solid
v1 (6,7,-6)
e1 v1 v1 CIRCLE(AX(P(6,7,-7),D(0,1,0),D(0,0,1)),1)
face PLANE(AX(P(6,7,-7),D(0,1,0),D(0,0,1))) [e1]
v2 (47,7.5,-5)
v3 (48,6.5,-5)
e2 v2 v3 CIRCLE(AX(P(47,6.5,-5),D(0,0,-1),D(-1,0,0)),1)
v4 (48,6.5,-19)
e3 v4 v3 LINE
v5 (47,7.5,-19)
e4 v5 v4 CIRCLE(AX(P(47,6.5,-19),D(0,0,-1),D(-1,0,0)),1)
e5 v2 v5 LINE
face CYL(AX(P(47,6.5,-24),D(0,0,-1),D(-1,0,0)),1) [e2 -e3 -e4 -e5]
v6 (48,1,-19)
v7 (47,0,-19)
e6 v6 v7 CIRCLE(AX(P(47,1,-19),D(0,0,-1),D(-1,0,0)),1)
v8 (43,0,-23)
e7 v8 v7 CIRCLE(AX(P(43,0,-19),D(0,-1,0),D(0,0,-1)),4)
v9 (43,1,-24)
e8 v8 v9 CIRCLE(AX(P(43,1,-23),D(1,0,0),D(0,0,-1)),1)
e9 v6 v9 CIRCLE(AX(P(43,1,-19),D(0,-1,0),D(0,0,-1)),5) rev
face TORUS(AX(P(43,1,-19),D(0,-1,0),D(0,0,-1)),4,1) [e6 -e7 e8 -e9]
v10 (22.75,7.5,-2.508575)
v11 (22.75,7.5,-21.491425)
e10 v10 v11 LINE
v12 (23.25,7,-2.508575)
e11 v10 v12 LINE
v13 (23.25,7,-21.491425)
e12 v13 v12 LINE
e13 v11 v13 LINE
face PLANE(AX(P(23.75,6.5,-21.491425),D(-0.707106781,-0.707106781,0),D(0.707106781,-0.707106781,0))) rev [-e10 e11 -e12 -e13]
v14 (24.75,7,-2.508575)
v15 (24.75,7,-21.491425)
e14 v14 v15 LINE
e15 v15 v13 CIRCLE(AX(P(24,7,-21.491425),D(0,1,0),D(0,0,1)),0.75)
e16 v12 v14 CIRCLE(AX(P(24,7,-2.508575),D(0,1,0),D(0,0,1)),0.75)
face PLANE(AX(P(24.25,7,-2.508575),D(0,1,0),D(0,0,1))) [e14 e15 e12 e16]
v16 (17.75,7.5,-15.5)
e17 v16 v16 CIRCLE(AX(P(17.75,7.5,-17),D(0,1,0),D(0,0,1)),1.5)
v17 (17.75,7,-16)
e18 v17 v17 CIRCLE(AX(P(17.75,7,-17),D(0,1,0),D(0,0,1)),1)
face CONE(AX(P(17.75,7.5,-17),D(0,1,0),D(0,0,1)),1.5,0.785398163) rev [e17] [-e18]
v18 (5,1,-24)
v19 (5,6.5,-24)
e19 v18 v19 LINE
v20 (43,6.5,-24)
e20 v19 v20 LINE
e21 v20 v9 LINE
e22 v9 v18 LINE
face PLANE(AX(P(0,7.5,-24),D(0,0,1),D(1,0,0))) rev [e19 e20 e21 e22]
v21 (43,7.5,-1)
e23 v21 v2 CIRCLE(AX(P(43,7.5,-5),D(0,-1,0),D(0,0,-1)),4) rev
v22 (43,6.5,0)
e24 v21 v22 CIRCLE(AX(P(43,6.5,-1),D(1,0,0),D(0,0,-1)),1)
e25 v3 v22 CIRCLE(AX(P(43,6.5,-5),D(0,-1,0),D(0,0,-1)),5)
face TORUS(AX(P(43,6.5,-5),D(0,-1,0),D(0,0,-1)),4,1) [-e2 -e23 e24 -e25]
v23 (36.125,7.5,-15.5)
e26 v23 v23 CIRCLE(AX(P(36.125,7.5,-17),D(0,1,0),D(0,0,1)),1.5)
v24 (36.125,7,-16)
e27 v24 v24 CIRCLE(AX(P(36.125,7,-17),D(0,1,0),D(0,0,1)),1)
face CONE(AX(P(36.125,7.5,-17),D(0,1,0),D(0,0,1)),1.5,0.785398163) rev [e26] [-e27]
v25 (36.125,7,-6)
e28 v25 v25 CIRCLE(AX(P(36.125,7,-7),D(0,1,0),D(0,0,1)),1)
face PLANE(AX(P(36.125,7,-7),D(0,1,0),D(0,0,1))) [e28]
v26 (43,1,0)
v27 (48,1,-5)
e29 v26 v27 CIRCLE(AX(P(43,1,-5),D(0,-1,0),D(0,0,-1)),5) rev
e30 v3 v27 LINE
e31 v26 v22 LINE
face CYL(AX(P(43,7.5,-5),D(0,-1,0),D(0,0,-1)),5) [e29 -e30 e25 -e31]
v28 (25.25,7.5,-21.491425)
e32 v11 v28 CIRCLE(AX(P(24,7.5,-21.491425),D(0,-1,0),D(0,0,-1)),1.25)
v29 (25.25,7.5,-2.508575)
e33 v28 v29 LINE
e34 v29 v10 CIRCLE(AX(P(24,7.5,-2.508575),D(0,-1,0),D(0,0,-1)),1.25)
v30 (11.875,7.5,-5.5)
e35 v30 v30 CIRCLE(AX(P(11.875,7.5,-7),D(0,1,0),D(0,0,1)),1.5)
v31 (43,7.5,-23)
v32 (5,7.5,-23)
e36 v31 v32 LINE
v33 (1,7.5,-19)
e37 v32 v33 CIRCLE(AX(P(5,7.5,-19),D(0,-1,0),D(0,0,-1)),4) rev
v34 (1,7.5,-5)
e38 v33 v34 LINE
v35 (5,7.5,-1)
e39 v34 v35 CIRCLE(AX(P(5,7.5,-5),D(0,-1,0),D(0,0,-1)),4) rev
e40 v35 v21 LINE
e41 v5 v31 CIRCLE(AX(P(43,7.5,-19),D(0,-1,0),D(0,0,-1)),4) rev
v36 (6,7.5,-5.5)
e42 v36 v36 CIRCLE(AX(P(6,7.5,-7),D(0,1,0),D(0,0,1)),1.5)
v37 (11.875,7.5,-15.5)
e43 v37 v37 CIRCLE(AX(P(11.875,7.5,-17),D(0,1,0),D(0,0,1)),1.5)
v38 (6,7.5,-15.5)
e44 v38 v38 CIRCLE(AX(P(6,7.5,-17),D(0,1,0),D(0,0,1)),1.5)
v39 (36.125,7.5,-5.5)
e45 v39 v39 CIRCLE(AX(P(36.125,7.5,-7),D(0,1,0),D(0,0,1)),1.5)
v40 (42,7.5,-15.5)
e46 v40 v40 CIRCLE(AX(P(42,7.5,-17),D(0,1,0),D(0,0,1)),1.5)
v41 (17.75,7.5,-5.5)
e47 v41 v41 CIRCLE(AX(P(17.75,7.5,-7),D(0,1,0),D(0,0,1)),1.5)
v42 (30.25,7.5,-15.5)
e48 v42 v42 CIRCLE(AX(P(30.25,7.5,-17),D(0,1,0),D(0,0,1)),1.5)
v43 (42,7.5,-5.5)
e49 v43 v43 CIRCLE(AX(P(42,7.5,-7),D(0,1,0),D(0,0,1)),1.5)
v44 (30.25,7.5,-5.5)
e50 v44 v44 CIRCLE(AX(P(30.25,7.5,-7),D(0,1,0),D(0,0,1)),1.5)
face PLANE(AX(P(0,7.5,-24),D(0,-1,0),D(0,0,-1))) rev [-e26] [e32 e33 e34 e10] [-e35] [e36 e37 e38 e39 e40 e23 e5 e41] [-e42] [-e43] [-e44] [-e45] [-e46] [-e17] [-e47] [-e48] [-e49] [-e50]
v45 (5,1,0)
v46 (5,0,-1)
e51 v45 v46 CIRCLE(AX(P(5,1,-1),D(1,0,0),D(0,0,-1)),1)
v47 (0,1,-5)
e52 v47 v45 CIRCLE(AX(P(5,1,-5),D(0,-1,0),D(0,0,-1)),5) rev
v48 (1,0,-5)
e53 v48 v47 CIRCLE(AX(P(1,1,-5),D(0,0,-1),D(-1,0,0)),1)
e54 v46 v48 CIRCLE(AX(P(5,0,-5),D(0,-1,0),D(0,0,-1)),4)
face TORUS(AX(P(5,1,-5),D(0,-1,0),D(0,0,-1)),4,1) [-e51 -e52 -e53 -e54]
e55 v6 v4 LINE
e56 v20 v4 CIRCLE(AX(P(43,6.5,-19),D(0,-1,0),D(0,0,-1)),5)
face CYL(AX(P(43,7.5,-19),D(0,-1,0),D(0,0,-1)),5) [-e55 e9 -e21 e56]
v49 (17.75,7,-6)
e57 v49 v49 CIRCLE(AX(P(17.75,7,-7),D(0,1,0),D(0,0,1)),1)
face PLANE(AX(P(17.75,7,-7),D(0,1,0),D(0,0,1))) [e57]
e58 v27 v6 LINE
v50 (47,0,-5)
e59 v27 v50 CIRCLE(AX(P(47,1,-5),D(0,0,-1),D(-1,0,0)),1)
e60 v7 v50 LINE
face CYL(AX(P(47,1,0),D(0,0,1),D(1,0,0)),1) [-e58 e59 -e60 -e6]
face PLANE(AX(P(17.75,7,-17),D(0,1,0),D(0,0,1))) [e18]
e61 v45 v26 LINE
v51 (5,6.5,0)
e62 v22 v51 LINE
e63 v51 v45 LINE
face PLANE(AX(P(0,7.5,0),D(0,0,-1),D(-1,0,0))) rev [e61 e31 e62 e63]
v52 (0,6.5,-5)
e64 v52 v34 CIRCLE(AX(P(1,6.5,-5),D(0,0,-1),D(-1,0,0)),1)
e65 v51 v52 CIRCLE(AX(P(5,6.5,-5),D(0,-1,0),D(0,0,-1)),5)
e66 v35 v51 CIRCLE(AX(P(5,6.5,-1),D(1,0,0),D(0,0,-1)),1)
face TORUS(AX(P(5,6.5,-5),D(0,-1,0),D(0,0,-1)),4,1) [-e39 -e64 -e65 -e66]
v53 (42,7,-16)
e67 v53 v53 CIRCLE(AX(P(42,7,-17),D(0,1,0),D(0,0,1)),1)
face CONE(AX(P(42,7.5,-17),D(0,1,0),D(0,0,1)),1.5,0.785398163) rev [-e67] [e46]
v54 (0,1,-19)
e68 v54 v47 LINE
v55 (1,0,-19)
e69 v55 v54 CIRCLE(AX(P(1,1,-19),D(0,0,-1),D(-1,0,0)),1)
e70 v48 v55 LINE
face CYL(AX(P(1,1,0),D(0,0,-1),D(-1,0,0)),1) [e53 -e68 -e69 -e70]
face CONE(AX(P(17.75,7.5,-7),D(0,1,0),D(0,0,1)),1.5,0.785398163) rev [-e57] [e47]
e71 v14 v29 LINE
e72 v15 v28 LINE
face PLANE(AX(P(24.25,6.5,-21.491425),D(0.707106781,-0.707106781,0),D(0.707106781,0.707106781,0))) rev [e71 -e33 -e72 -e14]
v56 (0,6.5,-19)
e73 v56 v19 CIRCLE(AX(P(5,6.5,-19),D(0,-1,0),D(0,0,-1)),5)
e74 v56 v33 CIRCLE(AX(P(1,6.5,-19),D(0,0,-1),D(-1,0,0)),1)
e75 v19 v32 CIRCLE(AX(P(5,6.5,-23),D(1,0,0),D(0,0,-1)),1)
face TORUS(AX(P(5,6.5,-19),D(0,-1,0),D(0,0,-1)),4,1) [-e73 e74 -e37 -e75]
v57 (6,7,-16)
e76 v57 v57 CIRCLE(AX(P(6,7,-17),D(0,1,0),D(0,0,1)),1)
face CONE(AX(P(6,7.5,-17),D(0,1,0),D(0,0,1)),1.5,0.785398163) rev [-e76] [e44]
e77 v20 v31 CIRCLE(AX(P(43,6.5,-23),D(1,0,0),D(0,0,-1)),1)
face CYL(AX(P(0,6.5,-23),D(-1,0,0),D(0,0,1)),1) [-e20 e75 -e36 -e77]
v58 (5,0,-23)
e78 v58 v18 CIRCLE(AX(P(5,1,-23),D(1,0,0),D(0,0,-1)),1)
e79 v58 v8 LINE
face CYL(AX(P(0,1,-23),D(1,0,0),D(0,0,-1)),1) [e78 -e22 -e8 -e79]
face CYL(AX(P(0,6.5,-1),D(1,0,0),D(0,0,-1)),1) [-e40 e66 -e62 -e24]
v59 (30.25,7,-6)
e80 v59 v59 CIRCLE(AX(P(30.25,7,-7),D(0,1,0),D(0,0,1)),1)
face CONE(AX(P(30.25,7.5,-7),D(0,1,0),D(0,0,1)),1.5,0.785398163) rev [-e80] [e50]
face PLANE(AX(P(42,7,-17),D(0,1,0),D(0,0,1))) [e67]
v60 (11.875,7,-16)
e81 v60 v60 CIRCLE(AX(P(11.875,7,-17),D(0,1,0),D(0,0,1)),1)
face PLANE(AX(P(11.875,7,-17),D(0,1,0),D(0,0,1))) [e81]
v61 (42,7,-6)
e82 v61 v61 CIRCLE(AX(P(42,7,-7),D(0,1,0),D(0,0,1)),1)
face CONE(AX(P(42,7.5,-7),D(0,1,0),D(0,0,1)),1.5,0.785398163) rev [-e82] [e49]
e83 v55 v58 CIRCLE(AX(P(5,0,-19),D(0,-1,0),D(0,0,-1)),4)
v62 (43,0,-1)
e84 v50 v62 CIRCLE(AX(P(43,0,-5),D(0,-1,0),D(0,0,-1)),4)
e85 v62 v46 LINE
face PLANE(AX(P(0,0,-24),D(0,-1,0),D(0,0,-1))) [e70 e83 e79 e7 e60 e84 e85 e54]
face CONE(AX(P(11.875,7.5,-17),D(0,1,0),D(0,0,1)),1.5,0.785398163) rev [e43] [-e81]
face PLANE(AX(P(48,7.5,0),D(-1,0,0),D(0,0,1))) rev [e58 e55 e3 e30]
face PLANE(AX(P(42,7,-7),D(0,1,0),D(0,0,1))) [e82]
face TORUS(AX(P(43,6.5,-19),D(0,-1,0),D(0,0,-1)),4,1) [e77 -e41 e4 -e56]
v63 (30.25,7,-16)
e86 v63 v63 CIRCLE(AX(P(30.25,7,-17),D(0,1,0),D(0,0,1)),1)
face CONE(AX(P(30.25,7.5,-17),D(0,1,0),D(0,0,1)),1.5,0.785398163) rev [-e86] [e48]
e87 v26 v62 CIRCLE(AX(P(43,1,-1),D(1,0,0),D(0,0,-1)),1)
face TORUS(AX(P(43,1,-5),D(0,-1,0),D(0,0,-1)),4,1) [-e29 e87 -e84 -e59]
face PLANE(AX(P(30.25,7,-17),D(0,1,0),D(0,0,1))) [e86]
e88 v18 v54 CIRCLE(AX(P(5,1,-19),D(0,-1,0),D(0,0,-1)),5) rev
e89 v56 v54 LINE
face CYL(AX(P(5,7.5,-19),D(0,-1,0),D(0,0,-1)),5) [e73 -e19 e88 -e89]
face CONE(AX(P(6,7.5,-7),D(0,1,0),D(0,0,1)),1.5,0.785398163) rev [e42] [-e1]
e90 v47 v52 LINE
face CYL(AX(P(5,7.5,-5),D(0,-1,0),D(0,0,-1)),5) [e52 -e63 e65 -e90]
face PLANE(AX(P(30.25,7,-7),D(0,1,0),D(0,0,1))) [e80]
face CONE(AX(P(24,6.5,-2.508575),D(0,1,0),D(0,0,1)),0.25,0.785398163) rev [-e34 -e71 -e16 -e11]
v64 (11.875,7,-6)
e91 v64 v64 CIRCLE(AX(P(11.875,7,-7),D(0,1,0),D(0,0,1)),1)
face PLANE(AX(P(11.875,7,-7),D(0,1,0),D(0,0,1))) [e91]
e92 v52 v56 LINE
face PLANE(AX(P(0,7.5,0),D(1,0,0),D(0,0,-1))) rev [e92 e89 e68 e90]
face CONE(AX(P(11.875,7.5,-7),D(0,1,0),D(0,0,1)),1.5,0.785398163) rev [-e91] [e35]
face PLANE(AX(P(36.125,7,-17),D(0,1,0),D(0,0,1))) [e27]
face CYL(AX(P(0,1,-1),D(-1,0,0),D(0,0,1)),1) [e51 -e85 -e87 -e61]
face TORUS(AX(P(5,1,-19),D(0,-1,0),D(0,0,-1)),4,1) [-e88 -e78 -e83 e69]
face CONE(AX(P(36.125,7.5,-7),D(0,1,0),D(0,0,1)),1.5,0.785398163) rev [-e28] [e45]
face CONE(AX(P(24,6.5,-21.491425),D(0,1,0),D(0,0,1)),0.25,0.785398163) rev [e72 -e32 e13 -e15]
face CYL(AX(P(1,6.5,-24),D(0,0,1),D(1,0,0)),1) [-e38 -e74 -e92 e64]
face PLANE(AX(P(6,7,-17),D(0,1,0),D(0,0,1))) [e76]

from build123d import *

# Parameters (mm, degrees)
ESQUISSE1_W                 = 48
ESQUISSE1_H                 = 24
EXTRUSION1_DEPTH            = 7.5
CONG_2_R                    = 5
CONG_5_R                    = 1
CONG_6_R                    = 1
ESQUISSE4_W                 = 0.5
ESQUISSE4_H                 = 18.982849842
EXTRUSION2_DEPTH            = 0.5
ESQUISSE5_R                 = 0.25
EXTRUSION3_DEPTH            = 0.5
CHANFREIN1_SIZE             = 1
ESQUISSE6_R                 = 1.5
EXTRUSION6_DEPTH            = 0.5
EXTRUSION6_DRAFT            = -45
EXTRUSION6_PROFILE_2_DEPTH  = 0.5
EXTRUSION6_PROFILE_2_DRAFT  = -45
EXTRUSION6_PROFILE_3_DEPTH  = 0.5
EXTRUSION6_PROFILE_3_DRAFT  = -45
EXTRUSION6_PROFILE_4_DEPTH  = 0.5
EXTRUSION6_PROFILE_4_DRAFT  = -45
EXTRUSION6_PROFILE_5_DEPTH  = 0.5
EXTRUSION6_PROFILE_5_DRAFT  = -45
EXTRUSION6_PROFILE_6_DEPTH  = 0.5
EXTRUSION6_PROFILE_6_DRAFT  = -45
EXTRUSION6_PROFILE_7_DEPTH  = 0.5
EXTRUSION6_PROFILE_7_DRAFT  = -45
EXTRUSION6_PROFILE_8_DEPTH  = 0.5
EXTRUSION6_PROFILE_8_DRAFT  = -45
EXTRUSION6_PROFILE_9_DEPTH  = 0.5
EXTRUSION6_PROFILE_9_DRAFT  = -45
EXTRUSION6_PROFILE_10_DEPTH = 0.5
EXTRUSION6_PROFILE_10_DRAFT = -45
EXTRUSION6_PROFILE_11_DEPTH = 0.5
EXTRUSION6_PROFILE_11_DRAFT = -45
EXTRUSION6_PROFILE_12_DEPTH = 0.5
EXTRUSION6_PROFILE_12_DRAFT = -45


with BuildPart() as part:
    # Esquisse1 → Extrusion1 (new body)
    with BuildSketch(Plane(origin=(0, 0, 0), x_dir=(1, 0, 0), z_dir=(0, 1, 0))):
        with Locations((24, 12)):
            Rectangle(ESQUISSE1_W, ESQUISSE1_H)
    extrude(amount=EXTRUSION1_DEPTH)

    # Congé2
    cong_2_edges = [part.edges().sort_by_distance(p)[0] for p in [
        (0, 3.75, -24),
        (48, 3.75, -24),
        (48, 3.75, 0),
        (0, 3.75, 0),
    ]]
    fillet(cong_2_edges, radius=CONG_2_R)

    # Congé5
    cong_5_edges = [part.edges().sort_by_distance(p)[0] for p in [
        (48, 7.5, -12),
        (24, 7.5, 0),
        (0, 7.5, -12),
        (24, 7.5, -24),
        (1.464466094, 7.5, -22.535533906),
        (1.464466094, 7.5, -1.464466094),
        (46.535533906, 7.5, -22.535533906),
        (46.535533906, 7.5, -1.464466094),
    ]]
    fillet(cong_5_edges, radius=CONG_5_R)

    # Congé6
    cong_6_edges = [part.edges().sort_by_distance(p)[0] for p in [
        (48, 0, -12),
        (0, 0, -12),
        (24, 0, -24),
        (24, 0, 0),
        (1.464466094, 0, -22.535533906),
        (1.464466094, 0, -1.464466094),
        (46.535533906, 0, -22.535533906),
        (46.535533906, 0, -1.464466094),
    ]]
    fillet(cong_6_edges, radius=CONG_6_R)

    # Esquisse4 → Extrusion2 (cut)
    with BuildSketch(Plane(origin=(0, 7.5, 0), x_dir=(1, 0, 0), z_dir=(0, 1, 0))):
        with Locations((24, 12)):
            Rectangle(ESQUISSE4_W, ESQUISSE4_H)
    extrude(amount=-EXTRUSION2_DEPTH, mode=Mode.SUBTRACT)

    # Esquisse5 → Extrusion3 (cut)
    with BuildSketch(Plane(origin=(0, 7.5, 0), x_dir=(1, 0, 0), z_dir=(0, 1, 0))):
        with Locations((24, 21.491424921)):
            Circle(ESQUISSE5_R)
        with Locations((24, 2.508575079)):
            Circle(ESQUISSE5_R)
    extrude(amount=-EXTRUSION3_DEPTH, mode=Mode.SUBTRACT)

    # Chanfrein1
    # the kernel refuses this chamfer: 1 mm, written as the material it takes off along each edge
    with BuildSketch(Plane(origin=(24, 7.5, -21.491424921), x_dir=(1, 0, 0), z_dir=(0, 0, 1))) as chanfrein1_piece_1_section:
        Polygon((0.25 + CHANFREIN1_SIZE, 0), (0.25, -CHANFREIN1_SIZE), (0.25, 0), align=None)
    chanfrein1_piece_1 = revolve(axis=Axis((24, 7.5, -21.491424921), (0, 1, 0)), revolution_arc=180, mode=Mode.PRIVATE)
    chanfrein1_piece_1 = split(chanfrein1_piece_1, bisect_by=Plane(origin=(24, 7, -21.964580549), z_dir=(0, 1, 0)), keep=Keep.TOP, mode=Mode.PRIVATE)
    add(chanfrein1_piece_1, mode=Mode.SUBTRACT)
    with BuildSketch(Plane(origin=(24.25, 7.5, -21.491424921), x_dir=(0.9996219169112968, 0.02749587661058651, 0), z_dir=(0, 0, 1))) as chanfrein1_piece_2_section:
        Polygon((CHANFREIN1_SIZE * 0.999621916911, -CHANFREIN1_SIZE * 0.0274958766106), (-CHANFREIN1_SIZE * 0.0274958766106, -CHANFREIN1_SIZE * 0.999621916911), (0, 0), align=None)
    chanfrein1_piece_2 = extrude(amount=18.982849842, mode=Mode.PRIVATE)
    chanfrein1_piece_2 = split(chanfrein1_piece_2, bisect_by=Plane(origin=(24.643401084, 7, -12), z_dir=(0, 1, 0)), keep=Keep.TOP, mode=Mode.PRIVATE)
    add(chanfrein1_piece_2, mode=Mode.SUBTRACT)
    with BuildSketch(Plane(origin=(24, 7.5, -2.508575079), x_dir=(-1, 0, 0), z_dir=(0, 0, -1))) as chanfrein1_piece_3_section:
        Polygon((0.25 + CHANFREIN1_SIZE, 0), (0.25, -CHANFREIN1_SIZE), (0.25, 0), align=None)
    chanfrein1_piece_3 = revolve(axis=Axis((24, 7.5, -2.508575079), (0, 1, 0)), revolution_arc=180, mode=Mode.PRIVATE)
    chanfrein1_piece_3 = split(chanfrein1_piece_3, bisect_by=Plane(origin=(24, 7, -2.035419451), z_dir=(0, 1, 0)), keep=Keep.TOP, mode=Mode.PRIVATE)
    add(chanfrein1_piece_3, mode=Mode.SUBTRACT)
    with BuildSketch(Plane(origin=(23.75, 7.5, -2.508575079), x_dir=(-0.9996219169112968, 0.02749587661058651, 0), z_dir=(0, 0, -1))) as chanfrein1_piece_4_section:
        Polygon((CHANFREIN1_SIZE * 0.999621916911, -CHANFREIN1_SIZE * 0.0274958766106), (-CHANFREIN1_SIZE * 0.0274958766106, -CHANFREIN1_SIZE * 0.999621916911), (0, 0), align=None)
    chanfrein1_piece_4 = extrude(amount=18.982849842, mode=Mode.PRIVATE)
    chanfrein1_piece_4 = split(chanfrein1_piece_4, bisect_by=Plane(origin=(23.356598916, 7, -12), z_dir=(0, 1, 0)), keep=Keep.TOP, mode=Mode.PRIVATE)
    add(chanfrein1_piece_4, mode=Mode.SUBTRACT)


with BuildPart() as extrusion6_tool:
    # Esquisse6 → Extrusion6 (with draft: the straight prism first)
    with BuildSketch(Plane(origin=(0, 7.5, 0), x_dir=(1, 0, 0), z_dir=(0, 1, 0))):
        with Locations((42, 17)):
            Circle(ESQUISSE6_R)
    extrude(amount=-EXTRUSION6_DEPTH)
    # Extrusion6: the draft: its side faces are tilted about the plane it starts from
    extrusion6_sides = [extrusion6_tool.faces().sort_by_distance(p)[0] for p in [
        (40.5, 7.25, -17),
    ]]
    draft(extrusion6_sides, Plane(origin=(0, 7.5, 0), x_dir=(1, 0, 0), z_dir=(0, 1, 0)), EXTRUSION6_DRAFT)


with BuildPart() as part_1:
    add(part.part)

    # Extrusion6: cut by extrusion6_tool
    add(extrusion6_tool.part, mode=Mode.SUBTRACT)


with BuildPart() as extrusion6_profile_2_tool:
    # Esquisse6 → Extrusion6 profile 2 (with draft: the straight prism first)
    with BuildSketch(Plane(origin=(0, 7.5, 0), x_dir=(1, 0, 0), z_dir=(0, 1, 0))):
        with Locations((36.125, 17)):
            Circle(ESQUISSE6_R)
    extrude(amount=-EXTRUSION6_PROFILE_2_DEPTH)
    # Extrusion6 profile 2: the draft: its side faces are tilted about the plane it starts from
    extrusion6_profile_2_sides = [extrusion6_profile_2_tool.faces().sort_by_distance(p)[0] for p in [
        (34.625, 7.25, -17),
    ]]
    draft(extrusion6_profile_2_sides, Plane(origin=(0, 7.5, 0), x_dir=(1, 0, 0), z_dir=(0, 1, 0)), EXTRUSION6_PROFILE_2_DRAFT)


with BuildPart() as part_2:
    add(part_1.part)

    # Extrusion6 profile 2: cut by extrusion6_profile_2_tool
    add(extrusion6_profile_2_tool.part, mode=Mode.SUBTRACT)


with BuildPart() as extrusion6_profile_3_tool:
    # Esquisse6 → Extrusion6 profile 3 (with draft: the straight prism first)
    with BuildSketch(Plane(origin=(0, 7.5, 0), x_dir=(1, 0, 0), z_dir=(0, 1, 0))):
        with Locations((11.875, 17)):
            Circle(ESQUISSE6_R)
    extrude(amount=-EXTRUSION6_PROFILE_3_DEPTH)
    # Extrusion6 profile 3: the draft: its side faces are tilted about the plane it starts from
    extrusion6_profile_3_sides = [extrusion6_profile_3_tool.faces().sort_by_distance(p)[0] for p in [
        (10.375, 7.25, -17),
    ]]
    draft(extrusion6_profile_3_sides, Plane(origin=(0, 7.5, 0), x_dir=(1, 0, 0), z_dir=(0, 1, 0)), EXTRUSION6_PROFILE_3_DRAFT)


with BuildPart() as part_3:
    add(part_2.part)

    # Extrusion6 profile 3: cut by extrusion6_profile_3_tool
    add(extrusion6_profile_3_tool.part, mode=Mode.SUBTRACT)


with BuildPart() as extrusion6_profile_4_tool:
    # Esquisse6 → Extrusion6 profile 4 (with draft: the straight prism first)
    with BuildSketch(Plane(origin=(0, 7.5, 0), x_dir=(1, 0, 0), z_dir=(0, 1, 0))):
        with Locations((17.75, 17)):
            Circle(ESQUISSE6_R)
    extrude(amount=-EXTRUSION6_PROFILE_4_DEPTH)
    # Extrusion6 profile 4: the draft: its side faces are tilted about the plane it starts from
    extrusion6_profile_4_sides = [extrusion6_profile_4_tool.faces().sort_by_distance(p)[0] for p in [
        (16.25, 7.25, -17),
    ]]
    draft(extrusion6_profile_4_sides, Plane(origin=(0, 7.5, 0), x_dir=(1, 0, 0), z_dir=(0, 1, 0)), EXTRUSION6_PROFILE_4_DRAFT)


with BuildPart() as part_4:
    add(part_3.part)

    # Extrusion6 profile 4: cut by extrusion6_profile_4_tool
    add(extrusion6_profile_4_tool.part, mode=Mode.SUBTRACT)


with BuildPart() as extrusion6_profile_5_tool:
    # Esquisse6 → Extrusion6 profile 5 (with draft: the straight prism first)
    with BuildSketch(Plane(origin=(0, 7.5, 0), x_dir=(1, 0, 0), z_dir=(0, 1, 0))):
        with Locations((6, 17)):
            Circle(ESQUISSE6_R)
    extrude(amount=-EXTRUSION6_PROFILE_5_DEPTH)
    # Extrusion6 profile 5: the draft: its side faces are tilted about the plane it starts from
    extrusion6_profile_5_sides = [extrusion6_profile_5_tool.faces().sort_by_distance(p)[0] for p in [
        (4.5, 7.25, -17),
    ]]
    draft(extrusion6_profile_5_sides, Plane(origin=(0, 7.5, 0), x_dir=(1, 0, 0), z_dir=(0, 1, 0)), EXTRUSION6_PROFILE_5_DRAFT)


with BuildPart() as part_5:
    add(part_4.part)

    # Extrusion6 profile 5: cut by extrusion6_profile_5_tool
    add(extrusion6_profile_5_tool.part, mode=Mode.SUBTRACT)


with BuildPart() as extrusion6_profile_6_tool:
    # Esquisse6 → Extrusion6 profile 6 (with draft: the straight prism first)
    with BuildSketch(Plane(origin=(0, 7.5, 0), x_dir=(1, 0, 0), z_dir=(0, 1, 0))):
        with Locations((11.875, 7)):
            Circle(ESQUISSE6_R)
    extrude(amount=-EXTRUSION6_PROFILE_6_DEPTH)
    # Extrusion6 profile 6: the draft: its side faces are tilted about the plane it starts from
    extrusion6_profile_6_sides = [extrusion6_profile_6_tool.faces().sort_by_distance(p)[0] for p in [
        (10.375, 7.25, -7),
    ]]
    draft(extrusion6_profile_6_sides, Plane(origin=(0, 7.5, 0), x_dir=(1, 0, 0), z_dir=(0, 1, 0)), EXTRUSION6_PROFILE_6_DRAFT)


with BuildPart() as part_6:
    add(part_5.part)

    # Extrusion6 profile 6: cut by extrusion6_profile_6_tool
    add(extrusion6_profile_6_tool.part, mode=Mode.SUBTRACT)


with BuildPart() as extrusion6_profile_7_tool:
    # Esquisse6 → Extrusion6 profile 7 (with draft: the straight prism first)
    with BuildSketch(Plane(origin=(0, 7.5, 0), x_dir=(1, 0, 0), z_dir=(0, 1, 0))):
        with Locations((6, 7)):
            Circle(ESQUISSE6_R)
    extrude(amount=-EXTRUSION6_PROFILE_7_DEPTH)
    # Extrusion6 profile 7: the draft: its side faces are tilted about the plane it starts from
    extrusion6_profile_7_sides = [extrusion6_profile_7_tool.faces().sort_by_distance(p)[0] for p in [
        (4.5, 7.25, -7),
    ]]
    draft(extrusion6_profile_7_sides, Plane(origin=(0, 7.5, 0), x_dir=(1, 0, 0), z_dir=(0, 1, 0)), EXTRUSION6_PROFILE_7_DRAFT)


with BuildPart() as part_7:
    add(part_6.part)

    # Extrusion6 profile 7: cut by extrusion6_profile_7_tool
    add(extrusion6_profile_7_tool.part, mode=Mode.SUBTRACT)


with BuildPart() as extrusion6_profile_8_tool:
    # Esquisse6 → Extrusion6 profile 8 (with draft: the straight prism first)
    with BuildSketch(Plane(origin=(0, 7.5, 0), x_dir=(1, 0, 0), z_dir=(0, 1, 0))):
        with Locations((17.75, 7)):
            Circle(ESQUISSE6_R)
    extrude(amount=-EXTRUSION6_PROFILE_8_DEPTH)
    # Extrusion6 profile 8: the draft: its side faces are tilted about the plane it starts from
    extrusion6_profile_8_sides = [extrusion6_profile_8_tool.faces().sort_by_distance(p)[0] for p in [
        (16.25, 7.25, -7),
    ]]
    draft(extrusion6_profile_8_sides, Plane(origin=(0, 7.5, 0), x_dir=(1, 0, 0), z_dir=(0, 1, 0)), EXTRUSION6_PROFILE_8_DRAFT)


with BuildPart() as part_8:
    add(part_7.part)

    # Extrusion6 profile 8: cut by extrusion6_profile_8_tool
    add(extrusion6_profile_8_tool.part, mode=Mode.SUBTRACT)


with BuildPart() as extrusion6_profile_9_tool:
    # Esquisse6 → Extrusion6 profile 9 (with draft: the straight prism first)
    with BuildSketch(Plane(origin=(0, 7.5, 0), x_dir=(1, 0, 0), z_dir=(0, 1, 0))):
        with Locations((30.25, 17)):
            Circle(ESQUISSE6_R)
    extrude(amount=-EXTRUSION6_PROFILE_9_DEPTH)
    # Extrusion6 profile 9: the draft: its side faces are tilted about the plane it starts from
    extrusion6_profile_9_sides = [extrusion6_profile_9_tool.faces().sort_by_distance(p)[0] for p in [
        (28.75, 7.25, -17),
    ]]
    draft(extrusion6_profile_9_sides, Plane(origin=(0, 7.5, 0), x_dir=(1, 0, 0), z_dir=(0, 1, 0)), EXTRUSION6_PROFILE_9_DRAFT)


with BuildPart() as part_9:
    add(part_8.part)

    # Extrusion6 profile 9: cut by extrusion6_profile_9_tool
    add(extrusion6_profile_9_tool.part, mode=Mode.SUBTRACT)


with BuildPart() as extrusion6_profile_10_tool:
    # Esquisse6 → Extrusion6 profile 10 (with draft: the straight prism first)
    with BuildSketch(Plane(origin=(0, 7.5, 0), x_dir=(1, 0, 0), z_dir=(0, 1, 0))):
        with Locations((30.25, 7)):
            Circle(ESQUISSE6_R)
    extrude(amount=-EXTRUSION6_PROFILE_10_DEPTH)
    # Extrusion6 profile 10: the draft: its side faces are tilted about the plane it starts from
    extrusion6_profile_10_sides = [extrusion6_profile_10_tool.faces().sort_by_distance(p)[0] for p in [
        (28.75, 7.25, -7),
    ]]
    draft(extrusion6_profile_10_sides, Plane(origin=(0, 7.5, 0), x_dir=(1, 0, 0), z_dir=(0, 1, 0)), EXTRUSION6_PROFILE_10_DRAFT)


with BuildPart() as part_10:
    add(part_9.part)

    # Extrusion6 profile 10: cut by extrusion6_profile_10_tool
    add(extrusion6_profile_10_tool.part, mode=Mode.SUBTRACT)


with BuildPart() as extrusion6_profile_11_tool:
    # Esquisse6 → Extrusion6 profile 11 (with draft: the straight prism first)
    with BuildSketch(Plane(origin=(0, 7.5, 0), x_dir=(1, 0, 0), z_dir=(0, 1, 0))):
        with Locations((42, 7)):
            Circle(ESQUISSE6_R)
    extrude(amount=-EXTRUSION6_PROFILE_11_DEPTH)
    # Extrusion6 profile 11: the draft: its side faces are tilted about the plane it starts from
    extrusion6_profile_11_sides = [extrusion6_profile_11_tool.faces().sort_by_distance(p)[0] for p in [
        (40.5, 7.25, -7),
    ]]
    draft(extrusion6_profile_11_sides, Plane(origin=(0, 7.5, 0), x_dir=(1, 0, 0), z_dir=(0, 1, 0)), EXTRUSION6_PROFILE_11_DRAFT)


with BuildPart() as part_11:
    add(part_10.part)

    # Extrusion6 profile 11: cut by extrusion6_profile_11_tool
    add(extrusion6_profile_11_tool.part, mode=Mode.SUBTRACT)


with BuildPart() as extrusion6_profile_12_tool:
    # Esquisse6 → Extrusion6 profile 12 (with draft: the straight prism first)
    with BuildSketch(Plane(origin=(0, 7.5, 0), x_dir=(1, 0, 0), z_dir=(0, 1, 0))):
        with Locations((36.125, 7)):
            Circle(ESQUISSE6_R)
    extrude(amount=-EXTRUSION6_PROFILE_12_DEPTH)
    # Extrusion6 profile 12: the draft: its side faces are tilted about the plane it starts from
    extrusion6_profile_12_sides = [extrusion6_profile_12_tool.faces().sort_by_distance(p)[0] for p in [
        (34.625, 7.25, -7),
    ]]
    draft(extrusion6_profile_12_sides, Plane(origin=(0, 7.5, 0), x_dir=(1, 0, 0), z_dir=(0, 1, 0)), EXTRUSION6_PROFILE_12_DRAFT)


with BuildPart() as part_12:
    add(part_11.part)

    # Extrusion6 profile 12: cut by extrusion6_profile_12_tool
    add(extrusion6_profile_12_tool.part, mode=Mode.SUBTRACT)


solid = part_12.part
